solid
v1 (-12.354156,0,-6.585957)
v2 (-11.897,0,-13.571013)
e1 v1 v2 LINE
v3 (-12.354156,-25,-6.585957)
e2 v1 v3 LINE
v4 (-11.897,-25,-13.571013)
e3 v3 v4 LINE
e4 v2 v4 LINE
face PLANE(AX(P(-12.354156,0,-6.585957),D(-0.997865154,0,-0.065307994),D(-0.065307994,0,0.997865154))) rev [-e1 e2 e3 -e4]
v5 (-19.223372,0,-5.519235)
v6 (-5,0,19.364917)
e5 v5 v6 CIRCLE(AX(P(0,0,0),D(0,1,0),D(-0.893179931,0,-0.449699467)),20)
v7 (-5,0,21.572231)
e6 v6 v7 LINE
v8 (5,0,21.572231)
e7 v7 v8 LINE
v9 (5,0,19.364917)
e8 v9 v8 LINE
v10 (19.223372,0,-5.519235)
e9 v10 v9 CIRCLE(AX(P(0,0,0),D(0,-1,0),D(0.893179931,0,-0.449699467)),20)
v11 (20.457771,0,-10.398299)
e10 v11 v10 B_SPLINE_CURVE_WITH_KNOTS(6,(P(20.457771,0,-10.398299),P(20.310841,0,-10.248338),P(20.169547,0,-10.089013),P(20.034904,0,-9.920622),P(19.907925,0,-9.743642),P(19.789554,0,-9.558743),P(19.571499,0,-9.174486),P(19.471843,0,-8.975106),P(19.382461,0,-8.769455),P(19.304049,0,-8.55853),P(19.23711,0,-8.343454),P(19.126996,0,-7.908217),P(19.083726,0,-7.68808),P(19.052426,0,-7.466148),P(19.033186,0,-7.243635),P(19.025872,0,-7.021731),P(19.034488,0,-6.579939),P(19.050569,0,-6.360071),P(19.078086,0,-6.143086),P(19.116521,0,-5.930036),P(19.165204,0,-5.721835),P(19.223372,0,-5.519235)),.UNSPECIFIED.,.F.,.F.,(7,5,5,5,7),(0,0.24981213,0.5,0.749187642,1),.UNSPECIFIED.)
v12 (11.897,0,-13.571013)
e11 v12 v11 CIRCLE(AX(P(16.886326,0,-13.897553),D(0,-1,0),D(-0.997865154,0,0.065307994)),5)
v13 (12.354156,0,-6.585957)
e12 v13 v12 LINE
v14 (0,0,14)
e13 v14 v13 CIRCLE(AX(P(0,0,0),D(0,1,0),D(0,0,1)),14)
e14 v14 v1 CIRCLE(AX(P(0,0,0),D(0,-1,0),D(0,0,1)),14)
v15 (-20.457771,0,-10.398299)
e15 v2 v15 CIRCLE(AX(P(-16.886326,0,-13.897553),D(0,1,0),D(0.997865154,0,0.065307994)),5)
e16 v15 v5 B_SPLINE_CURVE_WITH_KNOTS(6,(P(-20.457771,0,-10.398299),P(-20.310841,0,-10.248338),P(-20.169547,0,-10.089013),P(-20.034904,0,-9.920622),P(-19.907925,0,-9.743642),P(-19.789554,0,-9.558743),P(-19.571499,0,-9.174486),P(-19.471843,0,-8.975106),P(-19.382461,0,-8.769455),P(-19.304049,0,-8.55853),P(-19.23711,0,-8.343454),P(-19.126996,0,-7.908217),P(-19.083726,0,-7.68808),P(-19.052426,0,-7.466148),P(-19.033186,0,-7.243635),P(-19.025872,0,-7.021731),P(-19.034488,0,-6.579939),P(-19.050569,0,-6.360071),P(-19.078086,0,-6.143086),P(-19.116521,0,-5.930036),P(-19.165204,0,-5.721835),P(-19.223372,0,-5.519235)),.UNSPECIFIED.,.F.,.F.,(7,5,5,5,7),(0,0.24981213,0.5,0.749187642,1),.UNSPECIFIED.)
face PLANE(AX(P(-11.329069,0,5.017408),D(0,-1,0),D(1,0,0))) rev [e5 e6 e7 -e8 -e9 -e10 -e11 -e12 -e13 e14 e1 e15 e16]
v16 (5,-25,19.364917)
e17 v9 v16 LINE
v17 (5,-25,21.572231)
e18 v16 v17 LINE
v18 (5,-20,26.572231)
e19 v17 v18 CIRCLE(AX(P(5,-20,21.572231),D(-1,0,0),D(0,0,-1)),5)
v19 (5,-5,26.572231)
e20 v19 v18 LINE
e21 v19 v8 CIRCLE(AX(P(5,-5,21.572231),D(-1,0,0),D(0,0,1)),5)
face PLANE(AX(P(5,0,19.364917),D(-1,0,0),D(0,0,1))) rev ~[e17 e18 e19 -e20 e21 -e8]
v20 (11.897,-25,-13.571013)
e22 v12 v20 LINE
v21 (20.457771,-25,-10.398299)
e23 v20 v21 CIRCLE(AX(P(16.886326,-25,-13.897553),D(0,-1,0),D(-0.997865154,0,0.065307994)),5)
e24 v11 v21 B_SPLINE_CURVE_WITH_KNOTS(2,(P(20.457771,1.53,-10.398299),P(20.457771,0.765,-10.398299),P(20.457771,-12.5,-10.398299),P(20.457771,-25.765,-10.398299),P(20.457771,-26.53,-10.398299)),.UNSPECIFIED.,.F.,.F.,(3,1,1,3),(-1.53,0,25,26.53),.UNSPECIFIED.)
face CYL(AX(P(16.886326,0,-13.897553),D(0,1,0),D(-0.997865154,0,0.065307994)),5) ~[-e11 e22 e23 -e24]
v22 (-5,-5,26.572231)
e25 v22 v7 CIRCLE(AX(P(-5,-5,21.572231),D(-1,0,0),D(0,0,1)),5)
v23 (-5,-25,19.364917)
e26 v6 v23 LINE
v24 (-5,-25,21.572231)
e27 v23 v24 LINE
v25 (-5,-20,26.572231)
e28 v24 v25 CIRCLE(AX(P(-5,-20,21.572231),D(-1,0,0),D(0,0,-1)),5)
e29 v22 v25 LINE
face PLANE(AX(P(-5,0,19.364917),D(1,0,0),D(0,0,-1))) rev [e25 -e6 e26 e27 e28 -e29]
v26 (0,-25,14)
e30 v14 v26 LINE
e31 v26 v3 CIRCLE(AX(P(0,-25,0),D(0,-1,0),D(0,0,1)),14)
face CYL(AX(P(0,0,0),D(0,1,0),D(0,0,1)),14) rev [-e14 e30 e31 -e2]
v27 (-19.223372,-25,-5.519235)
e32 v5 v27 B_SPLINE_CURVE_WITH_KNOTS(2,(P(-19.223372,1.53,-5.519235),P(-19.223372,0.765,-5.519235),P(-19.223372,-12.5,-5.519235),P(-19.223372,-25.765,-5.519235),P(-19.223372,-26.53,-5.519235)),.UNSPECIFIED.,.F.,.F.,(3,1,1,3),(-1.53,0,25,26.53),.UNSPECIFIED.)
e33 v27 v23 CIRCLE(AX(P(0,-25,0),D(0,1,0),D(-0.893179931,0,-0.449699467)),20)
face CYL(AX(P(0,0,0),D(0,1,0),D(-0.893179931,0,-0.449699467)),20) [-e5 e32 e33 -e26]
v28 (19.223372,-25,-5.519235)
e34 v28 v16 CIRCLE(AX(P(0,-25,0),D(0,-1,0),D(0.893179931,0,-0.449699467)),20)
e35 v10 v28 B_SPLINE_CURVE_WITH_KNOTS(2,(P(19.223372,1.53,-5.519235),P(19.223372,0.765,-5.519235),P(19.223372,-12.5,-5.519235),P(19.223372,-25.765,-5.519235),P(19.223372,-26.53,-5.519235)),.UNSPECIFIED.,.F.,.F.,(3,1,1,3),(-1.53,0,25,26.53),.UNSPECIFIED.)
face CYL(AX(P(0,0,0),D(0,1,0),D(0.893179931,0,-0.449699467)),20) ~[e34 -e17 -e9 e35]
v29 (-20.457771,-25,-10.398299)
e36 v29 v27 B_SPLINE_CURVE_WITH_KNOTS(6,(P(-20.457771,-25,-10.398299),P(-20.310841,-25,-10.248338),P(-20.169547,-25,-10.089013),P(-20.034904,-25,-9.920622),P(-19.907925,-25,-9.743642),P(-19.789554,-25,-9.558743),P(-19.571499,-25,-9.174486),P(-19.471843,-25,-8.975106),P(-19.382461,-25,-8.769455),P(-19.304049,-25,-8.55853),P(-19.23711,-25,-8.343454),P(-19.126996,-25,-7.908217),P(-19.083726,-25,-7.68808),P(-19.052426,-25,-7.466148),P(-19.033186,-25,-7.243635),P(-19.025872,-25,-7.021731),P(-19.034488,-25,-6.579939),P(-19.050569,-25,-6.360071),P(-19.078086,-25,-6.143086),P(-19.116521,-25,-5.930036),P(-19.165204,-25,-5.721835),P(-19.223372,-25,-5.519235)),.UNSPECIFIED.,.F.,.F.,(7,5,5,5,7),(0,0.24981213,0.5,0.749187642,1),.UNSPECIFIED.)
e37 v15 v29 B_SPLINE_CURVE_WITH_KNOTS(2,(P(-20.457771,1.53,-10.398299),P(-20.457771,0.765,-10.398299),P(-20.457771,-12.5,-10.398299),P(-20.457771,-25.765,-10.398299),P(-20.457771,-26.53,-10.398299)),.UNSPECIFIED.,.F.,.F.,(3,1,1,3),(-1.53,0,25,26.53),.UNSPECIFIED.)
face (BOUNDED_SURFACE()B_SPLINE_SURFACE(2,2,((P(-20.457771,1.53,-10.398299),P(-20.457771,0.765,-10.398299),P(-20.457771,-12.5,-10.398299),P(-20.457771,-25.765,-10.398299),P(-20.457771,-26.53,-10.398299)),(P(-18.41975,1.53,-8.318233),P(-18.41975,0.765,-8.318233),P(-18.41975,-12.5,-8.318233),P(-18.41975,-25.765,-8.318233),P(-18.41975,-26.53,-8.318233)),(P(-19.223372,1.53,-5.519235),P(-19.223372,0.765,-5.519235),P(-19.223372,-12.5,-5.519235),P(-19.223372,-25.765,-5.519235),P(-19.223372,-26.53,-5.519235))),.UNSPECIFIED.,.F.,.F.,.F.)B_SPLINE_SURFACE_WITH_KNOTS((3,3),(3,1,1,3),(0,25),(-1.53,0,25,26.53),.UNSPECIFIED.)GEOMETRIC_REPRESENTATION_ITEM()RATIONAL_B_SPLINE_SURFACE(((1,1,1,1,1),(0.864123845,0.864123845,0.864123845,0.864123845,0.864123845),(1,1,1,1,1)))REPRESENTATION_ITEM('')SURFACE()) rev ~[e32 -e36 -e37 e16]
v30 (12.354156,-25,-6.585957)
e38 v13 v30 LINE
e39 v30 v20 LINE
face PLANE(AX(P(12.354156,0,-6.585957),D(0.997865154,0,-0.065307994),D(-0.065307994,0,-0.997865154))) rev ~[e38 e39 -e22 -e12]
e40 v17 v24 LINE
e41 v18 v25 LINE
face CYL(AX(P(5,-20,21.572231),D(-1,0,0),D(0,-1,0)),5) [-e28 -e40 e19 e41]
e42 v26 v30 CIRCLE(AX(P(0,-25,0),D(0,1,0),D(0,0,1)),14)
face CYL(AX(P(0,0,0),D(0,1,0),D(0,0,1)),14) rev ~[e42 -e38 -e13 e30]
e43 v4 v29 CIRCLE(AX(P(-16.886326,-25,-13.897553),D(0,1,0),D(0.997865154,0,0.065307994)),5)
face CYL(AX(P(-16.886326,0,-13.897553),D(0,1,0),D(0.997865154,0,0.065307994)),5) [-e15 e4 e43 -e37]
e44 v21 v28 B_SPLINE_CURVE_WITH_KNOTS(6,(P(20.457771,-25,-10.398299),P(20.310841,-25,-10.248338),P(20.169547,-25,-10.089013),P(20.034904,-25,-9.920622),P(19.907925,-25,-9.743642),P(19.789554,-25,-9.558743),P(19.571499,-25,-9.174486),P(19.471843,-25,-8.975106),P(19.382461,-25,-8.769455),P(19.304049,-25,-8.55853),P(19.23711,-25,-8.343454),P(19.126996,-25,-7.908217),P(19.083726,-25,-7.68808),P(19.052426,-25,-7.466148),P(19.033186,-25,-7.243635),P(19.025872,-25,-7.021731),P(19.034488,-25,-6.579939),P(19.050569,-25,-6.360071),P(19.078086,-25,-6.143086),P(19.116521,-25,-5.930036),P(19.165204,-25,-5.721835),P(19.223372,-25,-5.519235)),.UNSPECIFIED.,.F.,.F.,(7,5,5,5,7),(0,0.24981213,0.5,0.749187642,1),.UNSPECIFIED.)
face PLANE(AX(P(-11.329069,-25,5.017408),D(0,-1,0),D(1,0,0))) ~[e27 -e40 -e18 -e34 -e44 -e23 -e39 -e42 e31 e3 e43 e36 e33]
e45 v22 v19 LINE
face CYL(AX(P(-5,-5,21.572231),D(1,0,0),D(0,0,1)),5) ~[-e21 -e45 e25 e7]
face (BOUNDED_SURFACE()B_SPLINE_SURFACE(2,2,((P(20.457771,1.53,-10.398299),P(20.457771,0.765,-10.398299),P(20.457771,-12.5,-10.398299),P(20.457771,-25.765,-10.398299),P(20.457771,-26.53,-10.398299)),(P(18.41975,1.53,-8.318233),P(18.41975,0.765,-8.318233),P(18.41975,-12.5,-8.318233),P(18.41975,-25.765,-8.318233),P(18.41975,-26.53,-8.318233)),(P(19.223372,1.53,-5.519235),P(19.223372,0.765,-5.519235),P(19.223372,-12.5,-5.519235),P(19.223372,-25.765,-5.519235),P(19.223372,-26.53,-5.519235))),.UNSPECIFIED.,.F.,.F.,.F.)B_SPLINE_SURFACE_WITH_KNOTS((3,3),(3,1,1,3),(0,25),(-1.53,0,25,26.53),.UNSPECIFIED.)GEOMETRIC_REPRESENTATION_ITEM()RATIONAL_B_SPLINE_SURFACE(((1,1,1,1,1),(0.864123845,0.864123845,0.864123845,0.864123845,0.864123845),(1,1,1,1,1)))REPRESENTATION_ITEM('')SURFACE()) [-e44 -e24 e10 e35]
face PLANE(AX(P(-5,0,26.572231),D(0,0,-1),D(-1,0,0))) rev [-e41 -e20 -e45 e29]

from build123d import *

# Parameters (mm, degrees)
F1_DEPTH = 25
F3_R     = 5


# Not quite as in the source:
# - a feature names something its author has since deleted; it is built from what else it names


with BuildPart() as f1:
    # F0 (on Front) → F1 (new body)
    with BuildSketch(Plane.XZ):
        with BuildLine():
            ThreePointArc((11.897, -13.5710131507), (19.9295853554, -17.8647399206), (17.8635986234, -8.9939893385))
            ThreePointArc((17.8635986234, -8.9939893385), (18.2138113493, 8.2617840768), (5, 19.364916731))
            Line((5, 19.364916731), (5, 26.5722312033))
            Line((5, 26.5722312033), (0, 26.5722312033))
            Line((0, 26.5722312033), (0, 20))
            Line((0, 20), (0, 14))
            ThreePointArc((0, 14), (12.0042367313, 7.2040475081), (12.3541559587, -6.5859570715))
            Line((12.3541559587, -6.5859570715), (11.897, -13.5710131507))
        make_face()
    extrude(amount=F1_DEPTH)

    # F2: F1 across plane


with BuildPart() as f1_1:
    add(f1.part)
    add(f1.part.mirror(Plane.YZ))

    # F3
    f3_edges = [f1_1.edges().sort_by_distance(p)[0] for p in [
        (-17.863599, -12.5, -8.993989),
        (17.863599, -12.5, -8.993989),
        (0, -25, 26.572231),
        (0, 0, 26.572231),
    ]]
    fillet(f3_edges, radius=F3_R)


solid = f1_1.part
